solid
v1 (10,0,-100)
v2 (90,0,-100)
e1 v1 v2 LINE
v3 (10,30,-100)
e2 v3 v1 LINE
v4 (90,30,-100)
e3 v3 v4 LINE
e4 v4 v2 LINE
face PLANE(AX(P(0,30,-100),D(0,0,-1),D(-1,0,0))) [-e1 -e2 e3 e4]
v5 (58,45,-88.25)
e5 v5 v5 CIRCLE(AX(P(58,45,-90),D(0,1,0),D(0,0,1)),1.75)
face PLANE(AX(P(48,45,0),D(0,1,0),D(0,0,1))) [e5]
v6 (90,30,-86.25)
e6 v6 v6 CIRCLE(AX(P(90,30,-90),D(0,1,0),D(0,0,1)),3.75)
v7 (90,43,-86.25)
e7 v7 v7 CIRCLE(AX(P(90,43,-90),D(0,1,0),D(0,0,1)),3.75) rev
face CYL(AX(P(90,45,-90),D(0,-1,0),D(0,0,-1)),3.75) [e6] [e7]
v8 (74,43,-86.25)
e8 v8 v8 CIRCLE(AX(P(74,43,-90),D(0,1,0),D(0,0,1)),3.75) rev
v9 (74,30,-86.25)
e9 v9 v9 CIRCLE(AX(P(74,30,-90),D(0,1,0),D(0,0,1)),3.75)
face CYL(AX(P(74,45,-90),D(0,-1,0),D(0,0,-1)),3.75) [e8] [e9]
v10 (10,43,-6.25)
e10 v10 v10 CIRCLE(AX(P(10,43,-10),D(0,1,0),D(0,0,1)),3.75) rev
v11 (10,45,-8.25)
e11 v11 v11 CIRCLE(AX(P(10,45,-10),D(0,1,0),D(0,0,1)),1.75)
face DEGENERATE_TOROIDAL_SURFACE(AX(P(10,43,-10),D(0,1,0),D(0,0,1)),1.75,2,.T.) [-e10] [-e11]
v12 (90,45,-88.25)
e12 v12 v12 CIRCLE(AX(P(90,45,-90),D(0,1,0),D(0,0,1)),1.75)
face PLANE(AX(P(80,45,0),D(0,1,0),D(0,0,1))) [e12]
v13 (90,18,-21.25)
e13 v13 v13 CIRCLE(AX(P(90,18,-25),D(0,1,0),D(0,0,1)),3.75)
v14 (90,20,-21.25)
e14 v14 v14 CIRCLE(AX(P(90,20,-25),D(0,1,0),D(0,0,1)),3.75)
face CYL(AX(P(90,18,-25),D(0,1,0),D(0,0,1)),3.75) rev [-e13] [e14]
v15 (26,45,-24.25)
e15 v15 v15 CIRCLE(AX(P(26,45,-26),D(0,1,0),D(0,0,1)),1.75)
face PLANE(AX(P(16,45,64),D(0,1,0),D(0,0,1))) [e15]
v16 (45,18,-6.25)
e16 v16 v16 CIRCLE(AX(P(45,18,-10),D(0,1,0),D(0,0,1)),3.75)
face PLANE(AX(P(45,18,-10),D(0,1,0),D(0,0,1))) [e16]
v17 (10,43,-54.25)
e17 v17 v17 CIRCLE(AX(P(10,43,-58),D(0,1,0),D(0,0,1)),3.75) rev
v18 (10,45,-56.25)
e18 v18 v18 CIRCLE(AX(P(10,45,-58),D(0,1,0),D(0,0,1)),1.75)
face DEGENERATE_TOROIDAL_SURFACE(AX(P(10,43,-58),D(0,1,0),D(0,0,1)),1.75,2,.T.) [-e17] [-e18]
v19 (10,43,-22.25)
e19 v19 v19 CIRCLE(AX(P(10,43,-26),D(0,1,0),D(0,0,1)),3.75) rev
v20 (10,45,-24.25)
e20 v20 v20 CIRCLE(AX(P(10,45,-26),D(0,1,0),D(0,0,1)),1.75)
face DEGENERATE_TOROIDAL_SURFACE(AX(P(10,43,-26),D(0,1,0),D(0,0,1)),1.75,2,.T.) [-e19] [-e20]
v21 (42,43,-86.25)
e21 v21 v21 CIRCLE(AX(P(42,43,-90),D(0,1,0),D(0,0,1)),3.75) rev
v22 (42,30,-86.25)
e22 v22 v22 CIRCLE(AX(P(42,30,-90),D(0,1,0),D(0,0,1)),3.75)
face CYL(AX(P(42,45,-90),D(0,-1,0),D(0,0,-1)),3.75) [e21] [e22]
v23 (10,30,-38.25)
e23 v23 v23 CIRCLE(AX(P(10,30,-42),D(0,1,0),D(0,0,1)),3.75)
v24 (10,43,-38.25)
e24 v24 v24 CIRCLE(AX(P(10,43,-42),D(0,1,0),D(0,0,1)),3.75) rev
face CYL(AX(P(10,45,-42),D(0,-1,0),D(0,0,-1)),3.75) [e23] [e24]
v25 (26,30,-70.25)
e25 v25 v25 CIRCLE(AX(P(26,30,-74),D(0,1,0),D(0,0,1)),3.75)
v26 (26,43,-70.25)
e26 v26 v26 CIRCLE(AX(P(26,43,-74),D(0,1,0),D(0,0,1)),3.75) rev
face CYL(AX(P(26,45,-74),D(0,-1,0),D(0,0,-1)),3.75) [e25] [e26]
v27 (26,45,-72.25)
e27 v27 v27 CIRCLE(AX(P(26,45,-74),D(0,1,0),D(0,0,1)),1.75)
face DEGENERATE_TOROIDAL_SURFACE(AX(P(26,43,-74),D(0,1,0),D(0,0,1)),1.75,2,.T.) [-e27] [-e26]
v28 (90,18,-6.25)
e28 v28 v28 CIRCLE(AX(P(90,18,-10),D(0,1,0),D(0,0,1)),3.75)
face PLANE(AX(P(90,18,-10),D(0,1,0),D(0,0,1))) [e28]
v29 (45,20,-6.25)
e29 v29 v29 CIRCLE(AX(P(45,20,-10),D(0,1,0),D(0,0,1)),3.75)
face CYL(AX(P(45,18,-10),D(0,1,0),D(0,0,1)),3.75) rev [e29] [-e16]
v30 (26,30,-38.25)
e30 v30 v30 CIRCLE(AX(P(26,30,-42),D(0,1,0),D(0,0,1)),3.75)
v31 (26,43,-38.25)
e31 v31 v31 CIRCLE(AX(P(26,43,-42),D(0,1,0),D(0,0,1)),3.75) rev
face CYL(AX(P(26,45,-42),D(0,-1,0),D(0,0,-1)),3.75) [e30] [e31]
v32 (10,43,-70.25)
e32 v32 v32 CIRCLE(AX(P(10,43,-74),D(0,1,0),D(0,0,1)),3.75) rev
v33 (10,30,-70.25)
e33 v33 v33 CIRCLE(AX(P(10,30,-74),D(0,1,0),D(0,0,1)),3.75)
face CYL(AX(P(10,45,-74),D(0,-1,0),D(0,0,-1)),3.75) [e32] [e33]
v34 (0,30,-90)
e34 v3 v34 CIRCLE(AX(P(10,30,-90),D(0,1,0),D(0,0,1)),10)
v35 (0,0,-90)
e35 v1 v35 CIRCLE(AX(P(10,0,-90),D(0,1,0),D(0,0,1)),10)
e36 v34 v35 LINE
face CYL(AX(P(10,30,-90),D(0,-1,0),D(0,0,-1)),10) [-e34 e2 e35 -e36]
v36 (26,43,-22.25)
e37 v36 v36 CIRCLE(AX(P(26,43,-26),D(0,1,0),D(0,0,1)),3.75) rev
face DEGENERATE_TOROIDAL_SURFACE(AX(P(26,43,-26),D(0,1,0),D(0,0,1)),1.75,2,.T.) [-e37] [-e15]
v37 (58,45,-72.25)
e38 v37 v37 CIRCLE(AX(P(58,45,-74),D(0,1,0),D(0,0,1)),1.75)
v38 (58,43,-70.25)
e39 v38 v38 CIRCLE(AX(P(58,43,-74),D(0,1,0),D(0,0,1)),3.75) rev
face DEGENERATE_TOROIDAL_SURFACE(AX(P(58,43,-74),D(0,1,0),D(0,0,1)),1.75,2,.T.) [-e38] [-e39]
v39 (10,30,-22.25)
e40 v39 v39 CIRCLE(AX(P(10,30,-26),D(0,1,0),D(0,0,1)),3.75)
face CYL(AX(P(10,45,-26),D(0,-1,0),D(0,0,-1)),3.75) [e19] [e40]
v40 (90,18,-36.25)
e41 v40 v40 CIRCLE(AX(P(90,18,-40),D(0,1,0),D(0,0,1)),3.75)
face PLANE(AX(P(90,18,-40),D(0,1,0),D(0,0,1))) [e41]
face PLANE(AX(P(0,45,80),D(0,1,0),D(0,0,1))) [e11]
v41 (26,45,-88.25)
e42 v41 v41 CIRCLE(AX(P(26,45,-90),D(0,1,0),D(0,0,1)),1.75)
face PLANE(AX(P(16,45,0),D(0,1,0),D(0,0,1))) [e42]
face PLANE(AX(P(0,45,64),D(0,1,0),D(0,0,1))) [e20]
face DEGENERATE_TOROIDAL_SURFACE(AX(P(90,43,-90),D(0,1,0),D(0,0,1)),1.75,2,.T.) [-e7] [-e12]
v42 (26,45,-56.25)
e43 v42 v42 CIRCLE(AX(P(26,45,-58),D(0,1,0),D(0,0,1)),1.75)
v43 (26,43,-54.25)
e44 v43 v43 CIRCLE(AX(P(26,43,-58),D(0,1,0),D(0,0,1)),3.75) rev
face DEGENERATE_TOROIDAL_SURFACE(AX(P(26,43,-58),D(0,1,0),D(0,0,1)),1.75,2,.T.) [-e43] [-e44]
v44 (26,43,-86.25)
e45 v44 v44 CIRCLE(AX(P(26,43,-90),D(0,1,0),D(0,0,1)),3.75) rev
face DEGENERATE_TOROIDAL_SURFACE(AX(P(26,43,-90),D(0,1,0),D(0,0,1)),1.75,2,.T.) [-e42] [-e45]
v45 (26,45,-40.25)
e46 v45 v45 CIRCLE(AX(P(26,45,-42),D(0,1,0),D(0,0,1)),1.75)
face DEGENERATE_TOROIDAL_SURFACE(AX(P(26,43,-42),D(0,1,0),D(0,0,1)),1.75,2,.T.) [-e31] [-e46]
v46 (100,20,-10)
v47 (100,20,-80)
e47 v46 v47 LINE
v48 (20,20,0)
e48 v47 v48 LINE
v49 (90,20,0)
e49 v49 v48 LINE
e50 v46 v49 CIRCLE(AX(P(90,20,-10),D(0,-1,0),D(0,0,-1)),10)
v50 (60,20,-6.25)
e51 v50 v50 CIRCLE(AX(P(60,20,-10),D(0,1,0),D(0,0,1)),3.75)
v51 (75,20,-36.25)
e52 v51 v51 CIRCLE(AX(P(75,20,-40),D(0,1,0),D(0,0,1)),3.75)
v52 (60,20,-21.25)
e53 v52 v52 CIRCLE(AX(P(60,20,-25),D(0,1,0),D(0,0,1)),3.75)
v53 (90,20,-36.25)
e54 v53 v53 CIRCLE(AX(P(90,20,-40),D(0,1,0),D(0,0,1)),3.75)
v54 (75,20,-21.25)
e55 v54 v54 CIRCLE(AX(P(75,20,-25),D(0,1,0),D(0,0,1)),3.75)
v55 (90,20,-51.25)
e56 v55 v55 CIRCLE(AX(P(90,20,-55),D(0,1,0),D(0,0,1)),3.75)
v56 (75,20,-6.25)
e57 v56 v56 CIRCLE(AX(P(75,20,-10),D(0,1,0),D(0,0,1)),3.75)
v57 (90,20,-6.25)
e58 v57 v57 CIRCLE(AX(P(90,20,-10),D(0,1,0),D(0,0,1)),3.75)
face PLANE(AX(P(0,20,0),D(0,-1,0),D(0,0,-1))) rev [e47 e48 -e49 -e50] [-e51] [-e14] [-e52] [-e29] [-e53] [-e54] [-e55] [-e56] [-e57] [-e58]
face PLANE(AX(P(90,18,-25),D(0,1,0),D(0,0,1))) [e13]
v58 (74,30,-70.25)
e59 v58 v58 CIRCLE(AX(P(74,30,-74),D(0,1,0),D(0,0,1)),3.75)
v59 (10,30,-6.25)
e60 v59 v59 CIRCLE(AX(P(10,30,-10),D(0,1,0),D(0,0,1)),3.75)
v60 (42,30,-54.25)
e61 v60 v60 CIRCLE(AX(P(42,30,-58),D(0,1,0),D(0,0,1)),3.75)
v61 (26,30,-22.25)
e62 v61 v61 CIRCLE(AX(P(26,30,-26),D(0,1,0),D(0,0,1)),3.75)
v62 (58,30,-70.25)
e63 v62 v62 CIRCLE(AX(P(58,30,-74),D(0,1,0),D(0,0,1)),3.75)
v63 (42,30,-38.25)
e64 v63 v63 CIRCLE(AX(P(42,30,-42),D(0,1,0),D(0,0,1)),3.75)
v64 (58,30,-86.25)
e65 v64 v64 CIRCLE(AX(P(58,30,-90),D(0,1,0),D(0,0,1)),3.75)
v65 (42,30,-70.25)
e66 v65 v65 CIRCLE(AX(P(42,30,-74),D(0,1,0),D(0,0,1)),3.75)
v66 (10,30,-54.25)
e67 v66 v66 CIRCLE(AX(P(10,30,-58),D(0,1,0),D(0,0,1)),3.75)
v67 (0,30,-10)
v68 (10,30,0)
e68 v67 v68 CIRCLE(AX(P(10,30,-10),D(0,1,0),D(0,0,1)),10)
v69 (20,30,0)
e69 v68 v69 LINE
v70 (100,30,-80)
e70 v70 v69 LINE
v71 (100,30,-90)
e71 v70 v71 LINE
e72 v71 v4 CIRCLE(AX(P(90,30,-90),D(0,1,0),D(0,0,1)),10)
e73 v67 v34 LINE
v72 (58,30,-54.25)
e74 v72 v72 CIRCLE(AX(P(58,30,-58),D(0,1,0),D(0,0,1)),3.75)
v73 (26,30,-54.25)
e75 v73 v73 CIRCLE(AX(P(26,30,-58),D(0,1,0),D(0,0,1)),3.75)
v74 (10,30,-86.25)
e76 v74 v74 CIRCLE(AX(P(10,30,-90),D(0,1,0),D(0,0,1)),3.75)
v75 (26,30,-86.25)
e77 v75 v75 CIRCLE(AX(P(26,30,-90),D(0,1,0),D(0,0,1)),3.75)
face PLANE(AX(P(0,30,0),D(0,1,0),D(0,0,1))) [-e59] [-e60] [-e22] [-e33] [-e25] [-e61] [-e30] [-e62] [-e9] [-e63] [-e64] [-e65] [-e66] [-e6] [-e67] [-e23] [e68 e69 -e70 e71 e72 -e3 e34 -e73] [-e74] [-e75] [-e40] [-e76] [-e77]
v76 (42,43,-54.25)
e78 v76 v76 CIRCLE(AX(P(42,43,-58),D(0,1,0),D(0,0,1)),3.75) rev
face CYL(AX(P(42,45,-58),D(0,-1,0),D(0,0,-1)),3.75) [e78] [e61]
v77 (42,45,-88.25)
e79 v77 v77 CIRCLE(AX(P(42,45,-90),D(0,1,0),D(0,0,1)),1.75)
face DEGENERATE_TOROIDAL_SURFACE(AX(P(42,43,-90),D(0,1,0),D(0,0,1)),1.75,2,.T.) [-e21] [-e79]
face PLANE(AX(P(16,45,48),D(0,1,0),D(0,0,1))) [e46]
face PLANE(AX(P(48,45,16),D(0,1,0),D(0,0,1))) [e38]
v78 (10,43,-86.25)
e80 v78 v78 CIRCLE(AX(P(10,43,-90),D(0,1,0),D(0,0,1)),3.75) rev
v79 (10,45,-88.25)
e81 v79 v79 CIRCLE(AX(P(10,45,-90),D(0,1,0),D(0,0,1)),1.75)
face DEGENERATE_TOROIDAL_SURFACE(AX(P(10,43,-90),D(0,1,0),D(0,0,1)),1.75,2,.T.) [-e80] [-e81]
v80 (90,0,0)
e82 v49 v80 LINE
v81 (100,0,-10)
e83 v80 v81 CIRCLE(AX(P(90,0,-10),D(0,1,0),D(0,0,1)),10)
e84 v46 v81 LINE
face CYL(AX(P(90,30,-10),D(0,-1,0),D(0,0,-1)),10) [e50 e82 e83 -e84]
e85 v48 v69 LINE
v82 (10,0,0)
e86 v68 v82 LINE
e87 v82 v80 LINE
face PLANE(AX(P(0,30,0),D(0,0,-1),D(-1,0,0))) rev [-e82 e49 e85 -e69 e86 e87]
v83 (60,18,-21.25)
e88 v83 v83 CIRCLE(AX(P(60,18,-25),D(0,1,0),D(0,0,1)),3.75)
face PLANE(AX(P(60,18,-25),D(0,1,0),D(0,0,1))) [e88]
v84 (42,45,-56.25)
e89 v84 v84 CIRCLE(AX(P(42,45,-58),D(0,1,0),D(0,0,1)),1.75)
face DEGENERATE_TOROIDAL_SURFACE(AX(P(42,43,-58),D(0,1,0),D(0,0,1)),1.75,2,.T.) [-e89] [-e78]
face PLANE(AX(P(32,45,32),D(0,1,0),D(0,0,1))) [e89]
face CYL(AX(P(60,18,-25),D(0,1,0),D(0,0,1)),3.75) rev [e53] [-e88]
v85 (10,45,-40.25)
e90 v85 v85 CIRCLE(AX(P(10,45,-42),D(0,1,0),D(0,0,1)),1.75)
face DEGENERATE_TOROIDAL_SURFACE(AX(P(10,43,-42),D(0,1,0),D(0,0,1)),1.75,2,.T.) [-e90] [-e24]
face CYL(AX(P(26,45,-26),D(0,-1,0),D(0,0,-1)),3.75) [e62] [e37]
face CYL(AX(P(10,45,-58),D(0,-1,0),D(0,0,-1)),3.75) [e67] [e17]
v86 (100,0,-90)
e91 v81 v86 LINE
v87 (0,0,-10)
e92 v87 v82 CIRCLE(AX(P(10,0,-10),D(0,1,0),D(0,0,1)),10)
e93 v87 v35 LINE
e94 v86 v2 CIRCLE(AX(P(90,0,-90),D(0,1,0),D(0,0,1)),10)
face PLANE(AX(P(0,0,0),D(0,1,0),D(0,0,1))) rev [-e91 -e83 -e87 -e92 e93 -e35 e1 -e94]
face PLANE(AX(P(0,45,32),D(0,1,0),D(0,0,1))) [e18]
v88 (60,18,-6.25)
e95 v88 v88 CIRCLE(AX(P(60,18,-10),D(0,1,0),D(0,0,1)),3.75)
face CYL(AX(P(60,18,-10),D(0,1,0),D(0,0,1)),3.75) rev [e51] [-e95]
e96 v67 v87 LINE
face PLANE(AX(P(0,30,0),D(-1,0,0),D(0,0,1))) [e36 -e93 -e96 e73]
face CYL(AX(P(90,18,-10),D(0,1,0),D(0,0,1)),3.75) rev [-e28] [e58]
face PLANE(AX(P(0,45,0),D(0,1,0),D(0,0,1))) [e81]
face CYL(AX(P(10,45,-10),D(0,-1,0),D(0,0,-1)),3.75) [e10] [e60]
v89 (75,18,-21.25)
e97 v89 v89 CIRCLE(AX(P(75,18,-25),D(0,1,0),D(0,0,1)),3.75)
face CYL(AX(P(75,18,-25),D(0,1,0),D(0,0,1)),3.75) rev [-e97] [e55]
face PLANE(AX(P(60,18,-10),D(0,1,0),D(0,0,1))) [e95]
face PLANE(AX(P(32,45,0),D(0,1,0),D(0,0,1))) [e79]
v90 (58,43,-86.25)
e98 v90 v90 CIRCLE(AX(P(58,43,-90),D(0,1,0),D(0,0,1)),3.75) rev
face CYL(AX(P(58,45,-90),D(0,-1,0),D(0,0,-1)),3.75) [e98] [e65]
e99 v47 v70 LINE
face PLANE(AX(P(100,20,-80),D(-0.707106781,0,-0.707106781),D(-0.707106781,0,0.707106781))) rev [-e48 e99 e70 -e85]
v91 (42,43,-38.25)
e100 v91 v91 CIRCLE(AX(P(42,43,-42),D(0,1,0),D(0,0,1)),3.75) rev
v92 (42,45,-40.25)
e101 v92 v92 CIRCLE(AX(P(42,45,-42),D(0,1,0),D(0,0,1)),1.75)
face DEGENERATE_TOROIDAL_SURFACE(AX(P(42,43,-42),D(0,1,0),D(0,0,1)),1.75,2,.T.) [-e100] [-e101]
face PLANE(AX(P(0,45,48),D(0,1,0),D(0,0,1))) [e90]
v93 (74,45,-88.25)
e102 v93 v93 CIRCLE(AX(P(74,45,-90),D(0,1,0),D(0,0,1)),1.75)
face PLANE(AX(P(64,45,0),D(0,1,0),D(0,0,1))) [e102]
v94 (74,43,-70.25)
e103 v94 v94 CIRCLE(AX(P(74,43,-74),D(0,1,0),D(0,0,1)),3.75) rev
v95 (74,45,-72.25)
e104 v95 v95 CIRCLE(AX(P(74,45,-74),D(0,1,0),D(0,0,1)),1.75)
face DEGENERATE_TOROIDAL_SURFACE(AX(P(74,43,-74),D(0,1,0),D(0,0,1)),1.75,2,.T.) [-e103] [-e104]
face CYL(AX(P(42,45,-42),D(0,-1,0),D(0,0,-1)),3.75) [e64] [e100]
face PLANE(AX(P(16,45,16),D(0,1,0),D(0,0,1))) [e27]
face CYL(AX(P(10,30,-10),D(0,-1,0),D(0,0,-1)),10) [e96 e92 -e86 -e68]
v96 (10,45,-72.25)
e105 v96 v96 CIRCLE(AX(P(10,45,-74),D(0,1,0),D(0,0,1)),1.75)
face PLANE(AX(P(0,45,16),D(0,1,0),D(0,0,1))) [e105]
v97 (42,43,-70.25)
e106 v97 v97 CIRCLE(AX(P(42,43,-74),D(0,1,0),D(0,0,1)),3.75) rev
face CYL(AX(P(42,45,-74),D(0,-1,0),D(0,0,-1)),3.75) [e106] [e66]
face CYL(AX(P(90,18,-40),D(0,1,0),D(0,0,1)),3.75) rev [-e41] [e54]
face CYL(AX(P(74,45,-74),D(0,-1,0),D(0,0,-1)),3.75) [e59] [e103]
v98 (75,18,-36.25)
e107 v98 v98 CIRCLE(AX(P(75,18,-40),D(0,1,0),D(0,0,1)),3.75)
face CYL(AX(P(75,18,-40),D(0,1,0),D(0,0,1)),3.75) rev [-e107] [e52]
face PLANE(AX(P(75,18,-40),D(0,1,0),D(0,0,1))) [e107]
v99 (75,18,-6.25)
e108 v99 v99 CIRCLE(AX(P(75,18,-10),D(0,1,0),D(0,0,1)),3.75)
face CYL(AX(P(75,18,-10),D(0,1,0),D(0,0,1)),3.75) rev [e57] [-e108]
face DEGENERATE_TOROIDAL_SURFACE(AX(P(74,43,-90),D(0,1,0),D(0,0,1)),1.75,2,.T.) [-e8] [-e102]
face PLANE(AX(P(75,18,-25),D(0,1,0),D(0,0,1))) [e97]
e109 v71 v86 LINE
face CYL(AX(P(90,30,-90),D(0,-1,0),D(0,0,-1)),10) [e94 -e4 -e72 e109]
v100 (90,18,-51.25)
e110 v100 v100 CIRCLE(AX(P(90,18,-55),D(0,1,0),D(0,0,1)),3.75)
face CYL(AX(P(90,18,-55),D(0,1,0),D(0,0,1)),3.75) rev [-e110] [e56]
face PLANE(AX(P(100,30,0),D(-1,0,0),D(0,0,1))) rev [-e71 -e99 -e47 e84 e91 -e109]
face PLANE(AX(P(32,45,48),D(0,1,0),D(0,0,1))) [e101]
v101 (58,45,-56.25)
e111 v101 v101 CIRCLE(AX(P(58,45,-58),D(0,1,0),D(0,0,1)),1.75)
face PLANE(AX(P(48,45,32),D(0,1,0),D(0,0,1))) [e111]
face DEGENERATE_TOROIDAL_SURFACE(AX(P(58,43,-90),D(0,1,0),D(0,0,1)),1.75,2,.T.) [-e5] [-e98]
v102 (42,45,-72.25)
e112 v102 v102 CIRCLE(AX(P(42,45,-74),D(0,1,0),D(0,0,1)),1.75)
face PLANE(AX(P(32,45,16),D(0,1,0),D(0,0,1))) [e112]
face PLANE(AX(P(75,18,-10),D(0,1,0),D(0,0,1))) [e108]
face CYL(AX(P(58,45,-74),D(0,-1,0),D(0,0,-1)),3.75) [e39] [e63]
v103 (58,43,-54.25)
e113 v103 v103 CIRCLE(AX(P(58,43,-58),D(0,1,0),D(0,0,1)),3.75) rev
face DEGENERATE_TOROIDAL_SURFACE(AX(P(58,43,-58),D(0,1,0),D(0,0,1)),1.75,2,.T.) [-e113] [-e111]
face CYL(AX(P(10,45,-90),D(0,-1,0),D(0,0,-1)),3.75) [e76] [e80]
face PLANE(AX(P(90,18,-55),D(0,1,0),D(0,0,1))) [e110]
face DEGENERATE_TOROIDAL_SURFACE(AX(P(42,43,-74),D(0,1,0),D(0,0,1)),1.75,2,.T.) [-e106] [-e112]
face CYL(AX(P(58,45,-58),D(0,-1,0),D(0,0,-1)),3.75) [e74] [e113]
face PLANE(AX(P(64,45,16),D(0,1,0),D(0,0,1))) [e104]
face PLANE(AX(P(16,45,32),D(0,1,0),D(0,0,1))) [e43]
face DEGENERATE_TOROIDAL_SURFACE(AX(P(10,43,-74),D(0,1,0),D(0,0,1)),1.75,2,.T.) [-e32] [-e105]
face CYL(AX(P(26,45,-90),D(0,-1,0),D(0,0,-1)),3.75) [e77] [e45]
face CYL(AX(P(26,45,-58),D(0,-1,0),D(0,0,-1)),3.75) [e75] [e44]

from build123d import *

# Parameters (mm, degrees)
BOSS_EXTRUDE1_DEPTH = 30
BOSS_EXTRUDE3_DEPTH = 15
FILLET3_R           = 2
CUT_EXTRUDE3_DEPTH  = 10
SKETCH17_R          = 3.750000000000006
SKETCH17_R_2        = 3.7500000000000058
SKETCH17_R_3        = 3.750000000000007
CUT_EXTRUDE4_DEPTH  = 2


# Read off the part's stored shape, not the designer's step: CrvPattern8
with BuildPart() as part:
    # Sketch1 → Boss-Extrude1 (new body)
    with BuildSketch(Plane(origin=(0, 0, 0), x_dir=(1, 0, 0), z_dir=(0, 1, 0))):
        with BuildLine():
            ThreePointArc((0, 10), (2.9289321881345227, 2.9289321881345227), (10, 0))
            Line((10, 0), (90.00000000000001, 0))
            ThreePointArc((90.00000000000001, -5.33e-15), (97.07106781186549, 2.9289321881345227), (100, 10.000000000000002))
            Line((100, 10.000000000000002), (100, 90.00000000000001))
            ThreePointArc((100, 90.00000000000001), (97.07106781186548, 97.07106781186548), (90.00000000000001, 100))
            Line((90.00000000000001, 100), (10, 100))
            ThreePointArc((10, 100), (2.928932188134536, 97.07106781186548), (-3.55e-15, 90.00000000000001))
            Line((0, 90.00000000000001), (0, 10))
        make_face()
    extrude(amount=BOSS_EXTRUDE1_DEPTH)

    # Sketch13 → Boss-Extrude3 (add)
    with BuildSketch(Plane(origin=(0, 30, 0), x_dir=(1, 0, 0), z_dir=(0, 1, 0))):
        with BuildLine():
            Line((13.749999999999968, 89.99999999999994), (9.999999999999968, 89.99999999999994))
            Line((9.999999999999968, 89.99999999999994), (9.999999999999968, 86.24999999999994))
            ThreePointArc((10.000000000000053, 86.24999999999994), (12.651650429449552, 87.34834957055043), (13.749999999999968, 89.99999999999994))
        make_face()
        with BuildLine():
            Line((9.999999999999968, 93.74999999999994), (9.999999999999968, 89.99999999999994))
            Line((9.999999999999968, 89.99999999999994), (13.749999999999968, 89.99999999999994))
            ThreePointArc((13.749999999999968, 89.99999999999994), (12.651650429449552, 92.65165042944946), (10.000000000000055, 93.74999999999994))
        make_face()
        with BuildLine():
            ThreePointArc((10.000000000000055, 93.74999999999994), (7.348349570550445, 92.65165042944953), (6.249999999999968, 89.99999999999994))
            Line((6.249999999999968, 89.99999999999994), (9.999999999999968, 89.99999999999994))
            Line((9.999999999999968, 89.99999999999994), (9.999999999999968, 93.74999999999994))
        make_face()
        with BuildLine():
            Line((9.999999999999968, 89.99999999999994), (6.249999999999968, 89.99999999999994))
            ThreePointArc((6.249999999999968, 89.99999999999994), (7.348349570550445, 87.34834957055035), (10.000000000000053, 86.24999999999994))
            Line((9.999999999999968, 86.24999999999994), (9.999999999999968, 89.99999999999994))
        make_face()
    extrude(amount=BOSS_EXTRUDE3_DEPTH)

    # Fillet3
    fillet3_edges = [part.edges().sort_by_distance(p)[0] for p in [
        (13.749999999999947, 45, -89.99999999999997),
    ]]
    fillet(fillet3_edges, radius=FILLET3_R)

    # CrvPattern8 outline → CrvPattern8 (revolve)
    with BuildSketch(Plane(origin=(10, 0, -74), x_dir=(1, 0, 0), z_dir=(0, 0, 1))):
        with BuildLine():
            Line((1.75, 45), (0, 45))
            Line((0, 45), (0, 30))
            Line((0, 30), (3.75, 30))
            Line((3.75, 30), (3.75, 43))
            ThreePointArc((3.75, 43), (3.164213562, 44.414213562), (1.75, 45))
        make_face()
    revolve(axis=Axis((10, 0, -74), (0, 1, 0)))

    # CrvPattern8 2 outline → CrvPattern8 2 (revolve)
    with BuildSketch(Plane(origin=(10, 0, -58), x_dir=(1, 0, 0), z_dir=(0, 0, 1))):
        with BuildLine():
            Line((1.75, 45), (0, 45))
            Line((0, 45), (0, 30))
            Line((0, 30), (3.75, 30))
            Line((3.75, 30), (3.75, 43))
            ThreePointArc((3.75, 43), (3.164213562, 44.414213562), (1.75, 45))
        make_face()
    revolve(axis=Axis((10, 0, -58), (0, 1, 0)))

    # CrvPattern8 3 outline → CrvPattern8 3 (revolve)
    with BuildSketch(Plane(origin=(10, 0, -42), x_dir=(1, 0, 0), z_dir=(0, 0, 1))):
        with BuildLine():
            Line((1.75, 45), (0, 45))
            Line((0, 45), (0, 30))
            Line((0, 30), (3.75, 30))
            Line((3.75, 30), (3.75, 43))
            ThreePointArc((3.75, 43), (3.164213562, 44.414213562), (1.75, 45))
        make_face()
    revolve(axis=Axis((10, 0, -42), (0, 1, 0)))

    # CrvPattern8 4 outline → CrvPattern8 4 (revolve)
    with BuildSketch(Plane(origin=(10, 0, -26), x_dir=(1, 0, 0), z_dir=(0, 0, 1))):
        with BuildLine():
            Line((1.75, 45), (0, 45))
            Line((0, 45), (0, 30))
            Line((0, 30), (3.75, 30))
            Line((3.75, 30), (3.75, 43))
            ThreePointArc((3.75, 43), (3.164213562, 44.414213562), (1.75, 45))
        make_face()
    revolve(axis=Axis((10, 0, -26), (0, 1, 0)))

    # CrvPattern8 5 outline → CrvPattern8 5 (revolve)
    with BuildSketch(Plane(origin=(10, 0, -10), x_dir=(1, 0, 0), z_dir=(0, 0, 1))):
        with BuildLine():
            Line((1.75, 45), (0, 45))
            Line((0, 45), (0, 30))
            Line((0, 30), (3.75, 30))
            Line((3.75, 30), (3.75, 43))
            ThreePointArc((3.75, 43), (3.164213562, 44.414213562), (1.75, 45))
        make_face()
    revolve(axis=Axis((10, 0, -10), (0, 1, 0)))

    # CrvPattern8 6 outline → CrvPattern8 6 (revolve)
    with BuildSketch(Plane(origin=(26, 0, -90), x_dir=(1, 0, 0), z_dir=(0, 0, 1))):
        with BuildLine():
            Line((1.75, 45), (0, 45))
            Line((0, 45), (0, 30))
            Line((0, 30), (3.75, 30))
            Line((3.75, 30), (3.75, 43))
            ThreePointArc((3.75, 43), (3.164213562, 44.414213562), (1.75, 45))
        make_face()
    revolve(axis=Axis((26, 0, -90), (0, 1, 0)))

    # CrvPattern8 7 outline → CrvPattern8 7 (revolve)
    with BuildSketch(Plane(origin=(26, 0, -74), x_dir=(1, 0, 0), z_dir=(0, 0, 1))):
        with BuildLine():
            Line((1.75, 45), (0, 45))
            Line((0, 45), (0, 30))
            Line((0, 30), (3.75, 30))
            Line((3.75, 30), (3.75, 43))
            ThreePointArc((3.75, 43), (3.164213562, 44.414213562), (1.75, 45))
        make_face()
    revolve(axis=Axis((26, 0, -74), (0, 1, 0)))

    # CrvPattern8 8 outline → CrvPattern8 8 (revolve)
    with BuildSketch(Plane(origin=(26, 0, -58), x_dir=(1, 0, 0), z_dir=(0, 0, 1))):
        with BuildLine():
            Line((1.75, 45), (0, 45))
            Line((0, 45), (0, 30))
            Line((0, 30), (3.75, 30))
            Line((3.75, 30), (3.75, 43))
            ThreePointArc((3.75, 43), (3.164213562, 44.414213562), (1.75, 45))
        make_face()
    revolve(axis=Axis((26, 0, -58), (0, 1, 0)))

    # CrvPattern8 9 outline → CrvPattern8 9 (revolve)
    with BuildSketch(Plane(origin=(26, 0, -42), x_dir=(1, 0, 0), z_dir=(0, 0, 1))):
        with BuildLine():
            Line((1.75, 45), (0, 45))
            Line((0, 45), (0, 30))
            Line((0, 30), (3.75, 30))
            Line((3.75, 30), (3.75, 43))
            ThreePointArc((3.75, 43), (3.164213562, 44.414213562), (1.75, 45))
        make_face()
    revolve(axis=Axis((26, 0, -42), (0, 1, 0)))

    # CrvPattern8 10 outline → CrvPattern8 10 (revolve)
    with BuildSketch(Plane(origin=(26, 0, -26), x_dir=(1, 0, 0), z_dir=(0, 0, 1))):
        with BuildLine():
            Line((1.75, 45), (0, 45))
            Line((0, 45), (0, 30))
            Line((0, 30), (3.75, 30))
            Line((3.75, 30), (3.75, 43))
            ThreePointArc((3.75, 43), (3.164213562, 44.414213562), (1.75, 45))
        make_face()
    revolve(axis=Axis((26, 0, -26), (0, 1, 0)))

    # CrvPattern8 11 outline → CrvPattern8 11 (revolve)
    with BuildSketch(Plane(origin=(42, 0, -90), x_dir=(1, 0, 0), z_dir=(0, 0, 1))):
        with BuildLine():
            Line((1.75, 45), (0, 45))
            Line((0, 45), (0, 30))
            Line((0, 30), (3.75, 30))
            Line((3.75, 30), (3.75, 43))
            ThreePointArc((3.75, 43), (3.164213562, 44.414213562), (1.75, 45))
        make_face()
    revolve(axis=Axis((42, 0, -90), (0, 1, 0)))

    # CrvPattern8 12 outline → CrvPattern8 12 (revolve)
    with BuildSketch(Plane(origin=(42, 0, -74), x_dir=(1, 0, 0), z_dir=(0, 0, 1))):
        with BuildLine():
            Line((1.75, 45), (0, 45))
            Line((0, 45), (0, 30))
            Line((0, 30), (3.75, 30))
            Line((3.75, 30), (3.75, 43))
            ThreePointArc((3.75, 43), (3.164213562, 44.414213562), (1.75, 45))
        make_face()
    revolve(axis=Axis((42, 0, -74), (0, 1, 0)))

    # CrvPattern8 13 outline → CrvPattern8 13 (revolve)
    with BuildSketch(Plane(origin=(42, 0, -58), x_dir=(1, 0, 0), z_dir=(0, 0, 1))):
        with BuildLine():
            Line((1.75, 45), (0, 45))
            Line((0, 45), (0, 30))
            Line((0, 30), (3.75, 30))
            Line((3.75, 30), (3.75, 43))
            ThreePointArc((3.75, 43), (3.164213562, 44.414213562), (1.75, 45))
        make_face()
    revolve(axis=Axis((42, 0, -58), (0, 1, 0)))

    # CrvPattern8 14 outline → CrvPattern8 14 (revolve)
    with BuildSketch(Plane(origin=(42, 0, -42), x_dir=(1, 0, 0), z_dir=(0, 0, 1))):
        with BuildLine():
            Line((1.75, 45), (0, 45))
            Line((0, 45), (0, 30))
            Line((0, 30), (3.75, 30))
            Line((3.75, 30), (3.75, 43))
            ThreePointArc((3.75, 43), (3.164213562, 44.414213562), (1.75, 45))
        make_face()
    revolve(axis=Axis((42, 0, -42), (0, 1, 0)))

    # CrvPattern8 15 outline → CrvPattern8 15 (revolve)
    with BuildSketch(Plane(origin=(58, 0, -90), x_dir=(1, 0, 0), z_dir=(0, 0, 1))):
        with BuildLine():
            Line((1.75, 45), (0, 45))
            Line((0, 45), (0, 30))
            Line((0, 30), (3.75, 30))
            Line((3.75, 30), (3.75, 43))
            ThreePointArc((3.75, 43), (3.164213562, 44.414213562), (1.75, 45))
        make_face()
    revolve(axis=Axis((58, 0, -90), (0, 1, 0)))

    # CrvPattern8 16 outline → CrvPattern8 16 (revolve)
    with BuildSketch(Plane(origin=(58, 0, -74), x_dir=(1, 0, 0), z_dir=(0, 0, 1))):
        with BuildLine():
            Line((1.75, 45), (0, 45))
            Line((0, 45), (0, 30))
            Line((0, 30), (3.75, 30))
            Line((3.75, 30), (3.75, 43))
            ThreePointArc((3.75, 43), (3.164213562, 44.414213562), (1.75, 45))
        make_face()
    revolve(axis=Axis((58, 0, -74), (0, 1, 0)))

    # CrvPattern8 17 outline → CrvPattern8 17 (revolve)
    with BuildSketch(Plane(origin=(58, 0, -58), x_dir=(1, 0, 0), z_dir=(0, 0, 1))):
        with BuildLine():
            Line((1.75, 45), (0, 45))
            Line((0, 45), (0, 30))
            Line((0, 30), (3.75, 30))
            Line((3.75, 30), (3.75, 43))
            ThreePointArc((3.75, 43), (3.164213562, 44.414213562), (1.75, 45))
        make_face()
    revolve(axis=Axis((58, 0, -58), (0, 1, 0)))

    # CrvPattern8 18 outline → CrvPattern8 18 (revolve)
    with BuildSketch(Plane(origin=(74, 0, -90), x_dir=(1, 0, 0), z_dir=(0, 0, 1))):
        with BuildLine():
            Line((1.75, 45), (0, 45))
            Line((0, 45), (0, 30))
            Line((0, 30), (3.75, 30))
            Line((3.75, 30), (3.75, 43))
            ThreePointArc((3.75, 43), (3.164213562, 44.414213562), (1.75, 45))
        make_face()
    revolve(axis=Axis((74, 0, -90), (0, 1, 0)))

    # CrvPattern8 19 outline → CrvPattern8 19 (revolve)
    with BuildSketch(Plane(origin=(74, 0, -74), x_dir=(1, 0, 0), z_dir=(0, 0, 1))):
        with BuildLine():
            Line((1.75, 45), (0, 45))
            Line((0, 45), (0, 30))
            Line((0, 30), (3.75, 30))
            Line((3.75, 30), (3.75, 43))
            ThreePointArc((3.75, 43), (3.164213562, 44.414213562), (1.75, 45))
        make_face()
    revolve(axis=Axis((74, 0, -74), (0, 1, 0)))

    # CrvPattern8 20 outline → CrvPattern8 20 (revolve)
    with BuildSketch(Plane(origin=(90, 0, -90), x_dir=(1, 0, 0), z_dir=(0, 0, 1))):
        with BuildLine():
            Line((1.75, 45), (0, 45))
            Line((0, 45), (0, 30))
            Line((0, 30), (3.75, 30))
            Line((3.75, 30), (3.75, 43))
            ThreePointArc((3.75, 43), (3.164213562, 44.414213562), (1.75, 45))
        make_face()
    revolve(axis=Axis((90, 0, -90), (0, 1, 0)))

    # Sketch14 → Cut-Extrude3 (cut)
    with BuildSketch(Plane(origin=(0, 30, 0), x_dir=(1, 0, 0), z_dir=(0, 1, 0))):
        Polygon((100, 80), (20.000000000000004, -9.8e-15), (100, 0), align=None)
    extrude(amount=-CUT_EXTRUDE3_DEPTH, mode=Mode.SUBTRACT)

    # Sketch17 → Cut-Extrude4 (cut)
    with BuildSketch(Plane(origin=(0, 19.999999999999996, 0), x_dir=(1, 0, 0), z_dir=(0, 1, 0))):
        with Locations(Location((90.00000000000013, 10.000000000000002, 0), (0, 0, 270))):
            Circle(SKETCH17_R)
        with Locations(Location((44.9999999999999, 9.999999999999996, 0), (0, 0, 270))):
            Circle(SKETCH17_R)
        with Locations(Location((59.9999999999999, 10, 0), (0, 0, 270))):
            Circle(SKETCH17_R)
        with Locations(Location((75.00000000000001, 10, 0), (0, 0, 270))):
            Circle(SKETCH17_R)
        with Locations(Location((90.00000000000001, 25, 0), (0, 0, 270))):
            Circle(SKETCH17_R_2)
        with Locations(Location((74.9999999999999, 25, 0), (0, 0, 270))):
            Circle(SKETCH17_R_2)
        with Locations(Location((59.9999999999999, 24.999999999999996, 0), (0, 0, 270))):
            Circle(SKETCH17_R_2)
        with Locations(Location((74.9999999999999, 39.99999999999999, 0), (0, 0, 270))):
            Circle(SKETCH17_R_3)
        with Locations(Location((90.00000000000001, 39.99999999999999, 0), (0, 0, 270))):
            Circle(SKETCH17_R_3)
        with Locations(Location((90.00000000000001, 54.99999999999999, 0), (0, 0, 270))):
            Circle(SKETCH17_R_3)
    extrude(amount=-CUT_EXTRUDE4_DEPTH, mode=Mode.SUBTRACT)


solid = part.part
